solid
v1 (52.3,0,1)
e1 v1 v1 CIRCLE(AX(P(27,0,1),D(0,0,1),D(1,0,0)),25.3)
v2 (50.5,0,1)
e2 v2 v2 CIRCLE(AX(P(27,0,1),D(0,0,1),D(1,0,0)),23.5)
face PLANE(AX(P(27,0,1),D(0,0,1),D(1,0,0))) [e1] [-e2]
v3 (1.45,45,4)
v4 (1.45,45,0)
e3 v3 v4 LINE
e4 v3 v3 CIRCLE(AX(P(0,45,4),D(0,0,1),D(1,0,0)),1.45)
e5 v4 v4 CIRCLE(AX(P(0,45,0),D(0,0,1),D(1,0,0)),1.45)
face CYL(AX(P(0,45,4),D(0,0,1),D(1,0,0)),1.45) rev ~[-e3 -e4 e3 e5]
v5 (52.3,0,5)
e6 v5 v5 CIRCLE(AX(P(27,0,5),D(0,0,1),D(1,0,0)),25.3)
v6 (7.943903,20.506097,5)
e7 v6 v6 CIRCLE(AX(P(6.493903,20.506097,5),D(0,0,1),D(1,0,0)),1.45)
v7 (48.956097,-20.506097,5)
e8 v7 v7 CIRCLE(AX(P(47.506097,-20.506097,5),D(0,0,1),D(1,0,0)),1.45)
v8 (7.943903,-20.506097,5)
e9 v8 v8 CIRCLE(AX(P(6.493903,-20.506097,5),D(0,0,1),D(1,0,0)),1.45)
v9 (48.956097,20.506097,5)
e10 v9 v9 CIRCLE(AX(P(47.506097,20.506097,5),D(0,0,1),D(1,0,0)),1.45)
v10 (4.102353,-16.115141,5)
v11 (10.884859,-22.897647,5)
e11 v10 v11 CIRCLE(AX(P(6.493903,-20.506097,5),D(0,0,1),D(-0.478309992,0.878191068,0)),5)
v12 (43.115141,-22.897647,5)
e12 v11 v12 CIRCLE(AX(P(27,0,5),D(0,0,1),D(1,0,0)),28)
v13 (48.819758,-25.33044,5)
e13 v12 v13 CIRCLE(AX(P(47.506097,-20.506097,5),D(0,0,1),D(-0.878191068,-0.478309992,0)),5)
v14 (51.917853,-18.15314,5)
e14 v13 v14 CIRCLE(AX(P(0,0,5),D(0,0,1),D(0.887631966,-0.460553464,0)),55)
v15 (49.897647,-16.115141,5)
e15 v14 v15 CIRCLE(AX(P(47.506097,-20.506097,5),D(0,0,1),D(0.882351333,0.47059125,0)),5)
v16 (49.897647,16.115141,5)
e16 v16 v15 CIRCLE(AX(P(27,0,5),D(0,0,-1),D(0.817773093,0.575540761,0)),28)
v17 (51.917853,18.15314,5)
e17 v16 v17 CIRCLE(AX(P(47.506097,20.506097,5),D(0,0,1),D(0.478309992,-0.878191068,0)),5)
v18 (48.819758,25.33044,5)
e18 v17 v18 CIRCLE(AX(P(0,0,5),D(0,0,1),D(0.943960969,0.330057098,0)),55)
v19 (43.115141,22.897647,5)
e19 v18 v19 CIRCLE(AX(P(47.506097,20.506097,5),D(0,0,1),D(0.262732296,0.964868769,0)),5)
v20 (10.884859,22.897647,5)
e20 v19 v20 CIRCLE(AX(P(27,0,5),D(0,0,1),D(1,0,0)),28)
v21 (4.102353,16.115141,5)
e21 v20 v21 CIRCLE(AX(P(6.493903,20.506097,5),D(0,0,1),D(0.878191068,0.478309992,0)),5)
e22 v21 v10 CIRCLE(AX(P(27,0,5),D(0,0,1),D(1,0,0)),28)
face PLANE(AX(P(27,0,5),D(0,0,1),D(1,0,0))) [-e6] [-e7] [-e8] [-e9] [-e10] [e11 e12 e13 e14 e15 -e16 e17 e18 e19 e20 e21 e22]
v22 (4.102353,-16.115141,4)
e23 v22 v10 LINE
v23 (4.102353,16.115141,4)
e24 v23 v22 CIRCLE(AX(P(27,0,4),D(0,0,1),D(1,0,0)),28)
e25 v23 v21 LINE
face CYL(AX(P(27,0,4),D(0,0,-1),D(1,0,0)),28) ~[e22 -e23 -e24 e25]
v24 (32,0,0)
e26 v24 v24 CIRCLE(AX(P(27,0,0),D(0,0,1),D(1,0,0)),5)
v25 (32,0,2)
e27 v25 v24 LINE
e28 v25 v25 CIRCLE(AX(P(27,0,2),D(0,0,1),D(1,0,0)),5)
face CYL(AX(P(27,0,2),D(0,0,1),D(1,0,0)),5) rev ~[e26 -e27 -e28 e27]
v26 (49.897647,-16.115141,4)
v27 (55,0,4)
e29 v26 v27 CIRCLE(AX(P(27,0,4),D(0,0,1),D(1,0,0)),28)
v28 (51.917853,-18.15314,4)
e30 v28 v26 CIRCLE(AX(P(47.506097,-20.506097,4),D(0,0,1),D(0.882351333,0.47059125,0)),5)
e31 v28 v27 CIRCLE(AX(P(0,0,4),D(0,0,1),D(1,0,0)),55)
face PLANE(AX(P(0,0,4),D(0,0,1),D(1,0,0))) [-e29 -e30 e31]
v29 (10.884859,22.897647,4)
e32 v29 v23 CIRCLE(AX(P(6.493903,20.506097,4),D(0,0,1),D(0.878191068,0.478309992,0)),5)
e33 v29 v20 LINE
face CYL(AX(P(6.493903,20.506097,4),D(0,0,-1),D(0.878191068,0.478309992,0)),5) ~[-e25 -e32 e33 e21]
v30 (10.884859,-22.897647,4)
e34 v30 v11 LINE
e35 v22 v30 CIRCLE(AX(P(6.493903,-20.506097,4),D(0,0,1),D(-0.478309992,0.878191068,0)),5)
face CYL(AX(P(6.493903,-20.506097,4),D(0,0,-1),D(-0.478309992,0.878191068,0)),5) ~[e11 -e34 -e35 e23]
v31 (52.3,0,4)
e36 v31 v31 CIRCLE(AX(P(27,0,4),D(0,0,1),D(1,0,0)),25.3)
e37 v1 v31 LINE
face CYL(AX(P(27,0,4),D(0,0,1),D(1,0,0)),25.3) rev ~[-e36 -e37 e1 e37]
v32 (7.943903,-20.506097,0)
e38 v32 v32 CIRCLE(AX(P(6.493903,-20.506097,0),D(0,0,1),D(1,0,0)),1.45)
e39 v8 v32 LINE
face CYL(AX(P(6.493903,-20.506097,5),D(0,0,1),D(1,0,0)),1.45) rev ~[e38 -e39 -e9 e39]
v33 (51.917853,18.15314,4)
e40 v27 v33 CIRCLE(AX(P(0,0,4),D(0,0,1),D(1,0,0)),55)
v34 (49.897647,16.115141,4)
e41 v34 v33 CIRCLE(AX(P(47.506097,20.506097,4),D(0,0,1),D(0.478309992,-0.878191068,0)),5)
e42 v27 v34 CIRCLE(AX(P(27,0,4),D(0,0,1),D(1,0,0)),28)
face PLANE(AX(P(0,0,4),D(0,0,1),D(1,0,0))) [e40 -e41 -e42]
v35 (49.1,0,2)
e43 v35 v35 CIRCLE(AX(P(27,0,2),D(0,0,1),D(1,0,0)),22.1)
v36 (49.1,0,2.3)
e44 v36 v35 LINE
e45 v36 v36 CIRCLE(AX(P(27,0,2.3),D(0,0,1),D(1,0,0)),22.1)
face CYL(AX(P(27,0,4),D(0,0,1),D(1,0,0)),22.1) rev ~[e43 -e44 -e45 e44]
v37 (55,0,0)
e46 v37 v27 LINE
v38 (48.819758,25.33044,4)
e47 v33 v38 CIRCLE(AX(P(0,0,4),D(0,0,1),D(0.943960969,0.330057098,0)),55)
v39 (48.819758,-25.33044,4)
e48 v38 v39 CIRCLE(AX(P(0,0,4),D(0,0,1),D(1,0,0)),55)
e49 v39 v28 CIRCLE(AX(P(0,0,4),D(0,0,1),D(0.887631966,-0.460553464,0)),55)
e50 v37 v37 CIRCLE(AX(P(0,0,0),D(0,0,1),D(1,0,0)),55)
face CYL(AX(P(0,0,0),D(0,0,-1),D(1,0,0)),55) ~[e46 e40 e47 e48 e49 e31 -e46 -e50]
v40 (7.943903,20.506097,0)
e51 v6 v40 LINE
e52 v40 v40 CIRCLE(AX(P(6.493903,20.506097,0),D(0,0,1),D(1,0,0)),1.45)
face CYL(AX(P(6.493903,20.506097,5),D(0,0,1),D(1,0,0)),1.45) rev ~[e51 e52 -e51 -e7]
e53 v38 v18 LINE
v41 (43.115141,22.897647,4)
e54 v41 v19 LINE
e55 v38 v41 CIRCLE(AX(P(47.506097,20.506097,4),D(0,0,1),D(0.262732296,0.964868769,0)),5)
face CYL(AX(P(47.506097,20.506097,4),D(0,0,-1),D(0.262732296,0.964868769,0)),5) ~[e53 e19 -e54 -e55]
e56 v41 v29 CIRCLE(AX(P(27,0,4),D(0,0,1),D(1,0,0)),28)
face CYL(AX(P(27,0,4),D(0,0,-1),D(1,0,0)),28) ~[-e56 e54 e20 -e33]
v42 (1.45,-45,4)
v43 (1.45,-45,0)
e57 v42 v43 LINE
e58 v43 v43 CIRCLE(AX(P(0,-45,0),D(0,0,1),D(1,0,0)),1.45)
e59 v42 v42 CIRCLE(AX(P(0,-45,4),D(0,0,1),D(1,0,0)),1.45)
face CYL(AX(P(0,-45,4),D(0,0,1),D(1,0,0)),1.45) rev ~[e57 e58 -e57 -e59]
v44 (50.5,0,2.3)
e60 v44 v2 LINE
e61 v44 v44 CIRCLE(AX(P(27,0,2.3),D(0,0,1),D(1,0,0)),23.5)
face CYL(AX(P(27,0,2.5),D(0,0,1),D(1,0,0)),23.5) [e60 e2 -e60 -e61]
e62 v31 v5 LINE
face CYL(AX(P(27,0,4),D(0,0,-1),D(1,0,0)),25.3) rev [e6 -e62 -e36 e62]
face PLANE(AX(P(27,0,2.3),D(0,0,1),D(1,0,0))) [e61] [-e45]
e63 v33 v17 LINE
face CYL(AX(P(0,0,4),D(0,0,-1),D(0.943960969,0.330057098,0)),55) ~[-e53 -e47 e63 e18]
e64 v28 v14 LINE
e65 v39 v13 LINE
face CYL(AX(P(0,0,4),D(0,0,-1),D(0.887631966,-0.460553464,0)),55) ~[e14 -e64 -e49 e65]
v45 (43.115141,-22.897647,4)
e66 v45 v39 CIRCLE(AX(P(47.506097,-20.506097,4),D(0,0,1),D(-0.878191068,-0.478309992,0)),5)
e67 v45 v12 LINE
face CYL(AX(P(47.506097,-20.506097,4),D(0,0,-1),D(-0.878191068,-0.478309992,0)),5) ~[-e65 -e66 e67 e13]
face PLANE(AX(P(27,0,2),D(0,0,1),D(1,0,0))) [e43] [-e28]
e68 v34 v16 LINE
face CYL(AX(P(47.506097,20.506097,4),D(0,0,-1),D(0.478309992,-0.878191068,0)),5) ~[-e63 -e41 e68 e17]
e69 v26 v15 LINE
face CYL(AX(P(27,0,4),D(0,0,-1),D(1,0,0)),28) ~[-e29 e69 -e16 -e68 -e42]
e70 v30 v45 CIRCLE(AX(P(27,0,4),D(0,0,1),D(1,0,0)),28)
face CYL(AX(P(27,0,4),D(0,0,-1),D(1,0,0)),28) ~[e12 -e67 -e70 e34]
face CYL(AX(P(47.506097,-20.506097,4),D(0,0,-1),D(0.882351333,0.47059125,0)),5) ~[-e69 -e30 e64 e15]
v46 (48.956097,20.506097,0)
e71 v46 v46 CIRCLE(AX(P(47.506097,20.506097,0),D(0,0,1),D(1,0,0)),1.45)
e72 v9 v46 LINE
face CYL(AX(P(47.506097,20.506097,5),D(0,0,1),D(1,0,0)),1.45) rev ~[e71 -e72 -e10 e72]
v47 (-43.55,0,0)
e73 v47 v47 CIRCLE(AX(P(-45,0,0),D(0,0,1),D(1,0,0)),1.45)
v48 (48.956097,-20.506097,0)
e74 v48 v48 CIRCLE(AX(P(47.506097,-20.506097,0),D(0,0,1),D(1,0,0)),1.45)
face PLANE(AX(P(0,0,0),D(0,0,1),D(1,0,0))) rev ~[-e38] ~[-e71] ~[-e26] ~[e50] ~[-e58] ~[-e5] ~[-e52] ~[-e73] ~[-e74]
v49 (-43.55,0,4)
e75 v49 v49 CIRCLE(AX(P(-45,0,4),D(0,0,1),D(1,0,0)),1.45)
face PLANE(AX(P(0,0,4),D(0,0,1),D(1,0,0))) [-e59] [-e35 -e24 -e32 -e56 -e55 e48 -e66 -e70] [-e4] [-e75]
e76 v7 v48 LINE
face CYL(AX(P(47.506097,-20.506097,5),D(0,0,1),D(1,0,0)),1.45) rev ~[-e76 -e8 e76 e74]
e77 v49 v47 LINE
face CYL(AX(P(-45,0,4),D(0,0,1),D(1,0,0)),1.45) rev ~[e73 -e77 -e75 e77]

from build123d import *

# Parameters (mm, degrees)
F0_R      = 55
F1_DEPTH  = 4
F2_R      = 22.1
F3_DEPTH  = 2
F4_R      = 25.3
F4_R_2    = 22.1
F5_DEPTH  = 1.5
F6_R      = 25.3
F6_R_2    = 23.5
F7_DEPTH  = 1.5
F8_DEPTH  = 0.2
F9_R      = 28
F9_R_2    = 25.3
F10_DEPTH = 1
F11_R     = 5
F12_DEPTH = 25
F14_DEPTH = 1
F15_R     = 1.45
F16_DEPTH = 25
F17_R     = 1.45
F18_DEPTH = 25


with BuildPart() as f1:
    # F0 (on Top) → F1 (new body)
    with BuildSketch(Plane.XY):
        Circle(F0_R)
    extrude(amount=F1_DEPTH)

    # F2 (on face) → F3 (cut)
    with BuildSketch(Plane.XY.offset(4)):
        with Locations((27, 0)):
            Circle(F2_R)
    extrude(amount=-F3_DEPTH, mode=Mode.SUBTRACT)

    # F4 (on face) → F5 (cut)
    with BuildSketch(Plane.XY.offset(4)):
        with Locations((27, 0)):
            Circle(F4_R)
        with Locations((27, 0)):
            Circle(F4_R_2, mode=Mode.SUBTRACT)
    extrude(amount=-F5_DEPTH, mode=Mode.SUBTRACT)

    # F6 (on face) → F7 (cut)
    with BuildSketch(Plane.XY.offset(2.5)):
        with Locations((27, 0)):
            Circle(F6_R)
        with Locations((27, 0)):
            Circle(F6_R_2, mode=Mode.SUBTRACT)
    extrude(amount=-F7_DEPTH, mode=Mode.SUBTRACT)

    # F8 (cut): a face of the model
    f8_faces = [f1.faces().sort_by_distance(p)[0] for p in [
        (4.1646803743, 0, 2.5),
    ]]
    extrude(f8_faces, amount=-F8_DEPTH, mode=Mode.SUBTRACT)

    # F9 (on face) → F10 (join)
    with BuildSketch(Plane.XY.offset(4)):
        with Locations((27, 0)):
            Circle(F9_R)
        with Locations((27, 0)):
            Circle(F9_R_2, mode=Mode.SUBTRACT)
    extrude(amount=F10_DEPTH)

    # F11 (on face) → F12 (cut)
    with BuildSketch(Plane.XY.offset(2)):
        with Locations((27, 0)):
            Circle(F11_R)
    extrude(amount=-F12_DEPTH, mode=Mode.SUBTRACT)

    # F13 (on face) → F14 (join)
    with BuildSketch(Plane.XY.offset(4)):
        with BuildLine():
            ThreePointArc((10.8848586854, -22.8976466129), (7.2010101268, -19.7989898732), (4.1023533871, -16.1151413146))
            ThreePointArc((4.1023533871, -16.1151413146), (2.9583694397, -24.0416305603), (10.8848586854, -22.8976466129))
        make_face()
        with BuildLine():
            ThreePointArc((10.8848586854, 22.8976466129), (2.9583694397, 24.0416305603), (4.1023533871, 16.1151413146))
            ThreePointArc((4.1023533871, 16.1151413146), (7.2010101268, 19.7989898732), (10.8848586854, 22.8976466129))
        make_face()
        with BuildLine():
            ThreePointArc((49.8976466129, -16.1151413146), (46.7989898732, -19.7989898732), (43.1151413146, -22.8976466129))
            ThreePointArc((43.1151413146, -22.8976466129), (45.5447053375, -25.105329645), (48.8197581332, -25.3304404978))
            ThreePointArc((48.8197581332, -25.3304404978), (50.4964850216, -21.7969034605), (51.917853321, -18.1531404043))
            ThreePointArc((51.917853321, -18.1531404043), (51.0570972643, -16.9860974117), (49.8976466129, -16.1151413146))
        make_face()
        with BuildLine():
            ThreePointArc((48.8197581332, 25.3304404978), (45.5447053375, 25.105329645), (43.1151413146, 22.8976466129))
            ThreePointArc((43.1151413146, 22.8976466129), (46.7989898732, 19.7989898732), (49.8976466129, 16.1151413146))
            ThreePointArc((49.8976466129, 16.1151413146), (51.0570972643, 16.9860974117), (51.917853321, 18.1531404043))
            ThreePointArc((51.917853321, 18.1531404043), (50.4964850216, 21.7969034605), (48.8197581332, 25.3304404978))
        make_face()
    extrude(amount=F14_DEPTH)

    # F15 (on face) → F16 (cut)
    with BuildSketch(Plane.XY.offset(5)):
        with Locations((6.4939033456, 20.5060966544)):
            Circle(F15_R)
        with Locations((47.5060966544, 20.5060966544)):
            Circle(F15_R)
        with Locations((47.5060966544, -20.5060966544)):
            Circle(F15_R)
        with Locations((6.4939033456, -20.5060966544)):
            Circle(F15_R)
    extrude(amount=-F16_DEPTH, mode=Mode.SUBTRACT)

    # F17 (on face) → F18 (cut)
    with BuildSketch(Plane.XY.offset(4)):
        with Locations((0, 45)):
            Circle(F17_R)
        with Locations((-45, 0)):
            Circle(F17_R)
        with Locations((0, -45)):
            Circle(F17_R)
    extrude(amount=-F18_DEPTH, mode=Mode.SUBTRACT)


solid = f1.part
